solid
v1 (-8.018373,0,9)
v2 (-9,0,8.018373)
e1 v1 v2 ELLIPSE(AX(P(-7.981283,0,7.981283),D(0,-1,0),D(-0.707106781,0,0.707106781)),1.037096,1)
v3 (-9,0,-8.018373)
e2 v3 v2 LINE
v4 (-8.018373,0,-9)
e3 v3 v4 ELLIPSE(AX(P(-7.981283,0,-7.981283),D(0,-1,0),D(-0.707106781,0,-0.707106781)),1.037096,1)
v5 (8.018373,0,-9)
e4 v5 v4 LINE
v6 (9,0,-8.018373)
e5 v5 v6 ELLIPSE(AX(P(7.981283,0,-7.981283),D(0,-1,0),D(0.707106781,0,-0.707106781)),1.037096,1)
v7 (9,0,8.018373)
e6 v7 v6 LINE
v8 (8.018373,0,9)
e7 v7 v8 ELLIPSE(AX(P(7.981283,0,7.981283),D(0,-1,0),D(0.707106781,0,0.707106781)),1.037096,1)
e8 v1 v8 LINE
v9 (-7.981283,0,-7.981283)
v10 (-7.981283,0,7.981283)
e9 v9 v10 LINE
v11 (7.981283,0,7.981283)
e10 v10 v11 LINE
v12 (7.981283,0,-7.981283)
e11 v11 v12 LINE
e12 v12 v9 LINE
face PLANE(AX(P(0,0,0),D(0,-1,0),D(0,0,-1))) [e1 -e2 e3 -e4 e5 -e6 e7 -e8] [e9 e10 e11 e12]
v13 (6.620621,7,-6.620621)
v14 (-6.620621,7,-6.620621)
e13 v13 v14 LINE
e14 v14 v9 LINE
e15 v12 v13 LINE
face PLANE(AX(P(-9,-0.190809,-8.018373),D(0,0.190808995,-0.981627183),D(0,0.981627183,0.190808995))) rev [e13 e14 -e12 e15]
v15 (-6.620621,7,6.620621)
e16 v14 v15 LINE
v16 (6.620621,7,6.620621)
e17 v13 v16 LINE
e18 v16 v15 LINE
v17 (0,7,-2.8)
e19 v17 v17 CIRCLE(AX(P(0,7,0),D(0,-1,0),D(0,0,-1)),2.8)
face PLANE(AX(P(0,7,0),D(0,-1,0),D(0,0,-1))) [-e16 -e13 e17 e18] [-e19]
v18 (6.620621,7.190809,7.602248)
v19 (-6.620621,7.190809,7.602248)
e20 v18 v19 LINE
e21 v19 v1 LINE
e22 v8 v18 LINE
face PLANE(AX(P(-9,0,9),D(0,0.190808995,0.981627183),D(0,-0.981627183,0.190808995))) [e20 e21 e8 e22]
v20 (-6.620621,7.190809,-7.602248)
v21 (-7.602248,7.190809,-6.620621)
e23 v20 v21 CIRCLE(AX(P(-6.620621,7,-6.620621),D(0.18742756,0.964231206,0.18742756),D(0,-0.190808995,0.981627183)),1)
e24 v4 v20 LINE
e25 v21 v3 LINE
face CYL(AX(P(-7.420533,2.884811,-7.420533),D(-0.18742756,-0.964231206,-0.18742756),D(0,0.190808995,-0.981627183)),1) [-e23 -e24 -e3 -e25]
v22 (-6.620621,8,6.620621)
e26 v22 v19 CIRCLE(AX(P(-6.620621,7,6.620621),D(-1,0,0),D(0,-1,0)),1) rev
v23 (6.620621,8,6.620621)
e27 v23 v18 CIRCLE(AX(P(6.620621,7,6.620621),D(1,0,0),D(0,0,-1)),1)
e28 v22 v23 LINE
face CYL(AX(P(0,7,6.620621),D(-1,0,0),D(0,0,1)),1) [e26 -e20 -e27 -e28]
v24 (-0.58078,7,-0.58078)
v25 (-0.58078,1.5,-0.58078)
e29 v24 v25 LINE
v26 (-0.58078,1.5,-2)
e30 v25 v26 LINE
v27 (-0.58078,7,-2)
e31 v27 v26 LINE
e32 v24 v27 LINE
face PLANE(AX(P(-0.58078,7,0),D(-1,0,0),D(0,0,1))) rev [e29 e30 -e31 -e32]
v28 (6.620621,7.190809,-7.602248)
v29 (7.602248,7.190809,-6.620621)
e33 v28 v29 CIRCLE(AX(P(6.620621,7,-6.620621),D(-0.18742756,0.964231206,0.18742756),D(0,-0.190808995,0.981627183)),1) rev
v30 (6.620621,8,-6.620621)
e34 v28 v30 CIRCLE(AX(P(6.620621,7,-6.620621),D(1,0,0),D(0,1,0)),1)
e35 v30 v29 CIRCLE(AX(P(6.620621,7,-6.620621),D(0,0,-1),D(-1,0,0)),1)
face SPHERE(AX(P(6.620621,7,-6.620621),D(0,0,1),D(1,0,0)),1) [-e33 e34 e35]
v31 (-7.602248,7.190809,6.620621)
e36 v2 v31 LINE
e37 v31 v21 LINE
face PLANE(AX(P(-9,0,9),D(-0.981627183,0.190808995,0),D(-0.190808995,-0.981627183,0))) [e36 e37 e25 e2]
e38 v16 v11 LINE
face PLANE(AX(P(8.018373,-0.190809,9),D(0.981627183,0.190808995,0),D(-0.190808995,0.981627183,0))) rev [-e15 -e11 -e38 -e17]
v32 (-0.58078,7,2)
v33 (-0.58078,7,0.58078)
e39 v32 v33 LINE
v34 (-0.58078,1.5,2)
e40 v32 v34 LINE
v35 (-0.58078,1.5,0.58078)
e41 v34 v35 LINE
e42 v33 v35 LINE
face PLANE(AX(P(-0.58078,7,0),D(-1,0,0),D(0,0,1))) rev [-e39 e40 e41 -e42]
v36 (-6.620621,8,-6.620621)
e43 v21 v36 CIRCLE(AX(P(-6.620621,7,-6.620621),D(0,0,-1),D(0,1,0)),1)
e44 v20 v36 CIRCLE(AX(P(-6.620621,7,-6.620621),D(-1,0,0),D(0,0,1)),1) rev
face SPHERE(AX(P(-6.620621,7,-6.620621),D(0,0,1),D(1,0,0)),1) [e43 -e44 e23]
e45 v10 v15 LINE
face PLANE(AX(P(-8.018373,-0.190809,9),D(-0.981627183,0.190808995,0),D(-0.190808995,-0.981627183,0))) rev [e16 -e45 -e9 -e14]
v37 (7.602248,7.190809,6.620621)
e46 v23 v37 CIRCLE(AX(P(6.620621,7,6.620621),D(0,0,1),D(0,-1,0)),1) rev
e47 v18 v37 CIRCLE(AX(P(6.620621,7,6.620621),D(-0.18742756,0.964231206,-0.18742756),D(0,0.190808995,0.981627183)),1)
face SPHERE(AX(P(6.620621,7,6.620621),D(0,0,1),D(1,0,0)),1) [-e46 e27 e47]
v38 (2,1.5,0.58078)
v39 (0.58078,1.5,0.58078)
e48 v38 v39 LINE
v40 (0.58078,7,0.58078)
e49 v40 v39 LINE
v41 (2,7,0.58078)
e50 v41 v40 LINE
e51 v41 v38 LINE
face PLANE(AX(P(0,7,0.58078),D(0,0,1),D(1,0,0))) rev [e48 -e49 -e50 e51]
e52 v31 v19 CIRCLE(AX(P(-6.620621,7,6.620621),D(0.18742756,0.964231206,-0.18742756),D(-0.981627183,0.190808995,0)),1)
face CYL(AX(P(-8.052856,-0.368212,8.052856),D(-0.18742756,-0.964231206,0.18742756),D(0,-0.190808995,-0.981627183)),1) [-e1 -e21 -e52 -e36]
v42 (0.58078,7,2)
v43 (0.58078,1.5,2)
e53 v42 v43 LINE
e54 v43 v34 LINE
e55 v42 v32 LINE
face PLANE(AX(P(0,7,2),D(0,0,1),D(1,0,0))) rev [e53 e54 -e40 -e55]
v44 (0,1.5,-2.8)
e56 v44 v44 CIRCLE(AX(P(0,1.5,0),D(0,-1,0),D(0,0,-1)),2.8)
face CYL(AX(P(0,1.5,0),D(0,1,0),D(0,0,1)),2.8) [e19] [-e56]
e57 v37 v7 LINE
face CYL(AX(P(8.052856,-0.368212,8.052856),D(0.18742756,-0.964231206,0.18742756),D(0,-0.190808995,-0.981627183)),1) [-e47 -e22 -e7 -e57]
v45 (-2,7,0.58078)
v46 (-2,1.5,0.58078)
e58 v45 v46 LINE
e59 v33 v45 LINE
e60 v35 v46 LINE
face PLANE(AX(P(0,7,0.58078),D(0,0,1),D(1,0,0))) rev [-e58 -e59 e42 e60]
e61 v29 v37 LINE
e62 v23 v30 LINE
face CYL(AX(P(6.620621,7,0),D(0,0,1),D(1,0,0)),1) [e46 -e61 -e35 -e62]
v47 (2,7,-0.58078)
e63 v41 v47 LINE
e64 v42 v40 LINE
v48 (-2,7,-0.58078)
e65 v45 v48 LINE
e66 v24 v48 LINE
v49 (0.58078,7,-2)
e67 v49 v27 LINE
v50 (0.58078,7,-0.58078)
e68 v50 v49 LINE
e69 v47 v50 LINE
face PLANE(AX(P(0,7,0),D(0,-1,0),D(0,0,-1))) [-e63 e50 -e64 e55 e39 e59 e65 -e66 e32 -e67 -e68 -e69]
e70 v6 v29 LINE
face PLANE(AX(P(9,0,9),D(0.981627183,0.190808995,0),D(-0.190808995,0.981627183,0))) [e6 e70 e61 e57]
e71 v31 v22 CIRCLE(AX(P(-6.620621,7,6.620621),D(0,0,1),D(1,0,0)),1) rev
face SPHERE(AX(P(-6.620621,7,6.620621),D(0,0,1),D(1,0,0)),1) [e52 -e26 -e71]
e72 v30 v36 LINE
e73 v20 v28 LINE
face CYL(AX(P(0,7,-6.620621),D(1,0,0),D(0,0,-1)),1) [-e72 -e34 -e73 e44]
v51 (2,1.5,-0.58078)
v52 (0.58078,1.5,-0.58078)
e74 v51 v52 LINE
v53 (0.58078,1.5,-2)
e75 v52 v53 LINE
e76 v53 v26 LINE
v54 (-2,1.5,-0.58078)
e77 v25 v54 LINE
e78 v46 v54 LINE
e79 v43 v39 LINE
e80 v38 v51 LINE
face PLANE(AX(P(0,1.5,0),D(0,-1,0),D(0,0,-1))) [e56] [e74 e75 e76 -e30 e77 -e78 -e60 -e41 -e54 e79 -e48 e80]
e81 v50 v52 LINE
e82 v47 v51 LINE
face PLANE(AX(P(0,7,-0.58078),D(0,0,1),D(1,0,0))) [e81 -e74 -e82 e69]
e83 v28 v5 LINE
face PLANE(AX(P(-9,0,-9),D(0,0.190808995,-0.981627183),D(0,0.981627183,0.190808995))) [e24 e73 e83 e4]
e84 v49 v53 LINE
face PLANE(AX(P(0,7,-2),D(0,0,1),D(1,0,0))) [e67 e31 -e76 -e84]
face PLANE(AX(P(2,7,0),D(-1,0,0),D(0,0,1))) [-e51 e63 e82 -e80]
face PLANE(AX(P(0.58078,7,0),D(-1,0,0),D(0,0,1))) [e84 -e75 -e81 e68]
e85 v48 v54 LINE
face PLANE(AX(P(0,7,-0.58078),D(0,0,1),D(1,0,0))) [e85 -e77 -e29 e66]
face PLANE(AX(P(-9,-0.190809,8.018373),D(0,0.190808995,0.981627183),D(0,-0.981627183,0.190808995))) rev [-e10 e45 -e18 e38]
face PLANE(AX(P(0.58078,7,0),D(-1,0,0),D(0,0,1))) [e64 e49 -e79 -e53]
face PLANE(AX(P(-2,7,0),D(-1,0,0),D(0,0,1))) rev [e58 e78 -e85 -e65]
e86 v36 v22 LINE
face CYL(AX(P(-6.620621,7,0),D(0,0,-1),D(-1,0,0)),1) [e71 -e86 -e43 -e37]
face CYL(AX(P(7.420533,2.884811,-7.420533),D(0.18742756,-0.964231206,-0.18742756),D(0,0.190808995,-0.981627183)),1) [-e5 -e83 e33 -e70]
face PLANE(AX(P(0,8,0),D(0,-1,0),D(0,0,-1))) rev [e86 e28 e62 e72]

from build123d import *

# Parameters (mm, degrees)
SKETCH2_W           = 18
SKETCH2_H           = 18
BOSS_EXTRUDE1_DEPTH = 8
BOSS_EXTRUDE1_TAPER = 11
FILLET1_R           = 1
SHELL1_OUTLINE_W    = 13.241242282
SHELL1_OUTLINE_H    = 13.241242282
SHELL1_DEPTH        = 7
SHELL1_DRAFT        = 11
SKETCH3_R           = 2.8
BOSS_EXTRUDE2_DEPTH = 5.5
SKETCH4_W           = 1.161559242
SKETCH4_H           = 1.419220379
SKETCH4_H_2         = 1.161559242
SKETCH4_W_2         = 1.419220379
CUT_EXTRUDE1_DEPTH  = 5.5


# Read off the part's stored shape, not the designer's step: Shell1
with BuildPart() as part:
    # Sketch2 → Boss-Extrude1 (new body)
    with BuildSketch(Plane(origin=(0, 0, 0), x_dir=(1, 0, 0), z_dir=(0, 1, 0))):
        Rectangle(SKETCH2_W, SKETCH2_H)
    extrude(amount=BOSS_EXTRUDE1_DEPTH, taper=BOSS_EXTRUDE1_TAPER)

    # Fillet1
    fillet1_edges = [part.edges().sort_by_distance(p)[0] for p in [
        (-7.444957527, 8, 0),
        (0, 8, 7.444957527),
        (7.444957527, 8, 0),
        (8.222478763, 4, 8.222478763),
        (-8.222478763, 4, 8.222478763),
        (-8.222478763, 4, -8.222478763),
        (8.222478763, 4, -8.222478763),
        (0, 8, -7.444957527),
    ]]
    fillet(fillet1_edges, radius=FILLET1_R)


with BuildPart() as shell1_tool:
    # Shell1 outline → Shell1 (with draft: the straight prism first)
    with BuildSketch(Plane(origin=(0, 7, 0), x_dir=(1, 0, 0), z_dir=(0, 1, 0))):
        Rectangle(SHELL1_OUTLINE_W, SHELL1_OUTLINE_H)
    extrude(amount=-SHELL1_DEPTH)
    # Shell1: the draft: its side faces are tilted about the plane it starts from
    shell1_sides = [shell1_tool.faces().sort_by_distance(p)[0] for p in [
        (0, 3.5, -6.620621141),
        (-6.620621141, 3.5, 0),
        (0, 3.5, 6.620621141),
        (6.620621141, 3.5, 0),
    ]]
    draft(shell1_sides, Plane(origin=(0, 7, 0), x_dir=(1, 0, 0), z_dir=(0, 1, 0)), SHELL1_DRAFT)


with BuildPart() as part_1:
    add(part.part)

    # Shell1: cut by shell1_tool
    add(shell1_tool.part, mode=Mode.SUBTRACT)

    # Sketch3 → Boss-Extrude2 (add)
    with BuildSketch(Plane.XZ.offset(-7)):
        with Locations(Location((0, 0, 0), (0, 0, 270))):
            Circle(SKETCH3_R)
    extrude(amount=BOSS_EXTRUDE2_DEPTH)

    # Sketch4 → Cut-Extrude1 (cut)
    with BuildSketch(Plane.XZ.offset(-1.5)):
        with Locations((0, -1.290389811)):
            Rectangle(SKETCH4_W, SKETCH4_H)
        Rectangle(SKETCH4_W, SKETCH4_H_2)
        with Locations((-1.290389811, 0)):
            Rectangle(SKETCH4_W_2, SKETCH4_H_2)
        with Locations((1.290389811, 0)):
            Rectangle(SKETCH4_W_2, SKETCH4_H_2)
        with Locations((0, 1.290389811)):
            Rectangle(SKETCH4_W, SKETCH4_H)
    extrude(amount=-CUT_EXTRUDE1_DEPTH, mode=Mode.SUBTRACT)


solid = part_1.part
